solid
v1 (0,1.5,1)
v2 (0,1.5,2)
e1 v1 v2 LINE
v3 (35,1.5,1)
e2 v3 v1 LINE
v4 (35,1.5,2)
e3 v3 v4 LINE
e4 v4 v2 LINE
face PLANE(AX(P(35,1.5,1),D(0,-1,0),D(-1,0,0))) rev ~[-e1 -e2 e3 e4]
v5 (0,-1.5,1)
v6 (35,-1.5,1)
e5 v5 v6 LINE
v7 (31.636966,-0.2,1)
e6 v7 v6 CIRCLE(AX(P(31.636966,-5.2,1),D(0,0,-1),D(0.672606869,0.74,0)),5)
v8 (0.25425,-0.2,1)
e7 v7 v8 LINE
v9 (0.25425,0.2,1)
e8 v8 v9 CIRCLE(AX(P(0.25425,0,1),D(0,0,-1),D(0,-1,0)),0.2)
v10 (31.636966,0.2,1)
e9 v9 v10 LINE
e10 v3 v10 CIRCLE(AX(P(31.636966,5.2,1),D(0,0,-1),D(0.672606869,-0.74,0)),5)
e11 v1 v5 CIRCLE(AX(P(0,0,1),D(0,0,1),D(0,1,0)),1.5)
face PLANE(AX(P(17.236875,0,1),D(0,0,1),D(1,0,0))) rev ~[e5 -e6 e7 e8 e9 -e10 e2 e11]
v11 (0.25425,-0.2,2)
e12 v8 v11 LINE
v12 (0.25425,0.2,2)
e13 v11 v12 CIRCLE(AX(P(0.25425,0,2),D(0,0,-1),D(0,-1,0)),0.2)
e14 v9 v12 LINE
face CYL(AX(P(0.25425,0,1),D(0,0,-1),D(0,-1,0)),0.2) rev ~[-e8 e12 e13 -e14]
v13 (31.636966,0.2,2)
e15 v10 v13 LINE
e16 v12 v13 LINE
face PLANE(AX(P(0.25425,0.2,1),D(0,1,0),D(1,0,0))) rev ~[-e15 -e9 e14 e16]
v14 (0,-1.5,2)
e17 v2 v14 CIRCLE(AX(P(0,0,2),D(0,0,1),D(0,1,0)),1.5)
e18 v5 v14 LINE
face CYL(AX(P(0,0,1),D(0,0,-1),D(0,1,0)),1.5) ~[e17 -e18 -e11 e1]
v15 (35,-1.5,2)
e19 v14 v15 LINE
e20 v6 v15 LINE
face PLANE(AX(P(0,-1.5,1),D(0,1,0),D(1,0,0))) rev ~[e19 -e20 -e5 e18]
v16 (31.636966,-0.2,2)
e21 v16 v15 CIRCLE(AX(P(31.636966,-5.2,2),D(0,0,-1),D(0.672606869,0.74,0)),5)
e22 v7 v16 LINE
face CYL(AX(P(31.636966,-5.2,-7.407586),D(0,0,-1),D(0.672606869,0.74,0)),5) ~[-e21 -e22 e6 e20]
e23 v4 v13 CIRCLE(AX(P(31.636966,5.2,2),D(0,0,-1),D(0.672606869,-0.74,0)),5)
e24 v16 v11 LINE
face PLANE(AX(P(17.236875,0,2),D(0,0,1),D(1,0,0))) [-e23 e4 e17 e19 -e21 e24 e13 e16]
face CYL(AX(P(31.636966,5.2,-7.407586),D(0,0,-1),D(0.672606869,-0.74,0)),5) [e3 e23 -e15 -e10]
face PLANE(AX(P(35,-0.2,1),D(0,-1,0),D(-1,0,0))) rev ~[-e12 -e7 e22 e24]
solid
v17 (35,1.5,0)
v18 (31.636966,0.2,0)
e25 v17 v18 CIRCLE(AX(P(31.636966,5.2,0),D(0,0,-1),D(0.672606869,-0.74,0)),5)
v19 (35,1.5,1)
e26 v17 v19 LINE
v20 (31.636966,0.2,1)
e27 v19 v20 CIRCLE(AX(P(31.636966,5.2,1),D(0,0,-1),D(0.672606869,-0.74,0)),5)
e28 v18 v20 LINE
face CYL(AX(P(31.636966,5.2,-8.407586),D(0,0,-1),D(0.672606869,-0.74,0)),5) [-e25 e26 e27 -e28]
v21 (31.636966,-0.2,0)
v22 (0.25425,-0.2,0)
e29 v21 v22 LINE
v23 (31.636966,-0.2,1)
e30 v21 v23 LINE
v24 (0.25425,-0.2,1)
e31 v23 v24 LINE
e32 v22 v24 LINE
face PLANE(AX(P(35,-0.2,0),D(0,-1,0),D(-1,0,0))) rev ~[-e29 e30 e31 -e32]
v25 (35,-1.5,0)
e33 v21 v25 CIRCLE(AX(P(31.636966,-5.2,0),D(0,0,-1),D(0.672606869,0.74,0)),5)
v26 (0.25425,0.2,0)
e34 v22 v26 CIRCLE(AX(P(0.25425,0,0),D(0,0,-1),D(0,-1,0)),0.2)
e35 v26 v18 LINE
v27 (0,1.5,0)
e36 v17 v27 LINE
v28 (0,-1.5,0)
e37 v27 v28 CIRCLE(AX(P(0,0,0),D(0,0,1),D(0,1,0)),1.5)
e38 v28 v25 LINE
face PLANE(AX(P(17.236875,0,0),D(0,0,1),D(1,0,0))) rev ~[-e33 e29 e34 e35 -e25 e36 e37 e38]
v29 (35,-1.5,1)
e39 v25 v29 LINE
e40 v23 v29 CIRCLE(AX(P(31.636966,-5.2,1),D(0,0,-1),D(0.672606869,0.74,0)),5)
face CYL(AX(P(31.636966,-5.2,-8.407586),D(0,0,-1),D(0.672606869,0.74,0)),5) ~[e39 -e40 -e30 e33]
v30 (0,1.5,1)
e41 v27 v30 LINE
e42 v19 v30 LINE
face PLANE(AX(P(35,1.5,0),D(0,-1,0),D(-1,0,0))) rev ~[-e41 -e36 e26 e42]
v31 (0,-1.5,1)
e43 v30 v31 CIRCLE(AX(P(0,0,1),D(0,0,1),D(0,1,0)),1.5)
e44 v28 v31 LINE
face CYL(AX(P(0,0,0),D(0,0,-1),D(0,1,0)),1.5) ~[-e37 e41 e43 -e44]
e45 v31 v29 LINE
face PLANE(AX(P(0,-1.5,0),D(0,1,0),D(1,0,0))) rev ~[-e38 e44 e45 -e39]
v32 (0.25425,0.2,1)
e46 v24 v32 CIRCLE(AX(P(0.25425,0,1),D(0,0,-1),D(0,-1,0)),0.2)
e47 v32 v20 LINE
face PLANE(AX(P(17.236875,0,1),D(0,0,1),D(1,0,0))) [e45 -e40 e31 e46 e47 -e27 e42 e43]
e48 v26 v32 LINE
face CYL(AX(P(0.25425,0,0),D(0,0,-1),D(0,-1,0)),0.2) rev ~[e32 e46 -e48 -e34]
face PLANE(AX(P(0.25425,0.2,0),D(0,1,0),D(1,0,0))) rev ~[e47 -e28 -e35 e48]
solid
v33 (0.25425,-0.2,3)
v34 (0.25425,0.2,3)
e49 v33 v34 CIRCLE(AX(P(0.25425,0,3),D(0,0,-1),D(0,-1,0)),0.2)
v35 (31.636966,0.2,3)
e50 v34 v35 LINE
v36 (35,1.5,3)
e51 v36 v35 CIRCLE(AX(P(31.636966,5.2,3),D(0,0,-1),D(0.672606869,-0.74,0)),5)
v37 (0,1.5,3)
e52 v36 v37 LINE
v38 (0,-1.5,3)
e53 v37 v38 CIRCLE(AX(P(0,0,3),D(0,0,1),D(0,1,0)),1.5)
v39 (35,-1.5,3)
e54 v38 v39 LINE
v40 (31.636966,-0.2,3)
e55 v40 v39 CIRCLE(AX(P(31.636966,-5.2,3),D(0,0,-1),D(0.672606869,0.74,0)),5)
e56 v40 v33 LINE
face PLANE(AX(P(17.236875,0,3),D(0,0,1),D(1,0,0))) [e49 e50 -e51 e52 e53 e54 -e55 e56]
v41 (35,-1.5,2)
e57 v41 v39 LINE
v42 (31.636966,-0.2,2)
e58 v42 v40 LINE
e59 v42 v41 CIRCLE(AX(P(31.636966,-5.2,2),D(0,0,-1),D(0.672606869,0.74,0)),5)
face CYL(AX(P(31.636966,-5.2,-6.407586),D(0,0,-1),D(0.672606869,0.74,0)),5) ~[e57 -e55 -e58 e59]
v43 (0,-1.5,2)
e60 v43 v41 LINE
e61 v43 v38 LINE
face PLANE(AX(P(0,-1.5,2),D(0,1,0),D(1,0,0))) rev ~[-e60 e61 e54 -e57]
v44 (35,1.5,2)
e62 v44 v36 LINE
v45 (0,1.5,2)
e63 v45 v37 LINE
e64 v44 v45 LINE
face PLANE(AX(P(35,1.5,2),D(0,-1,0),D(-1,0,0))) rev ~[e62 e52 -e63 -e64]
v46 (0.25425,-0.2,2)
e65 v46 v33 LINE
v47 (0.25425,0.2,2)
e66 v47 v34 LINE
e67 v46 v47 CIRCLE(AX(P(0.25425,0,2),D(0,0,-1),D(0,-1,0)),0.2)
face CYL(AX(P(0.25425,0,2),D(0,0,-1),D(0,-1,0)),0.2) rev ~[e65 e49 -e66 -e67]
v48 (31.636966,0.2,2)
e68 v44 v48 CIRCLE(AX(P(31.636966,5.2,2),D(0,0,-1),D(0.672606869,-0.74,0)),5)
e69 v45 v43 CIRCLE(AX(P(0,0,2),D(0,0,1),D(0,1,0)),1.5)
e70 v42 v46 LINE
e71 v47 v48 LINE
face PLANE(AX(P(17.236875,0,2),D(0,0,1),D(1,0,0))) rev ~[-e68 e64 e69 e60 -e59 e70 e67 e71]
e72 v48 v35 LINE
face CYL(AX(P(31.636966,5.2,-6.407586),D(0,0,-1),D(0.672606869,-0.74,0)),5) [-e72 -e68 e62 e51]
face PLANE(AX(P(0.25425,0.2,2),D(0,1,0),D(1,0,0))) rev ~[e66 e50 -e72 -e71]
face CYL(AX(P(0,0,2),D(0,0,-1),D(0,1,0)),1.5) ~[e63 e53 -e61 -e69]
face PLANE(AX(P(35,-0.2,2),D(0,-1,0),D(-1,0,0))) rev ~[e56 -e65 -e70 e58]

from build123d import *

# Parameters (mm, degrees)
F1_DEPTH      = 1
F2_DEPTH      = 1
F3_DEPTH      = 1
F4_T1_DEPTH   = 17.8151717208
F4_2_T1_DEPTH = 17.8151717208
F4_3_T1_DEPTH = 17.8151717208


# Not quite as in the source:
# - a fillet or chamfer that OpenCascade refuses, or shapes differently, is made with other operations: its cross-section is extruded or revolved along the edge and cut away or added


with BuildPart() as f1:
    # F0 (on Top) → F1 (new body)
    with BuildSketch(Plane.XY):
        with BuildLine():
            Line((35, 1.5), (0, 1.5))
            ThreePointArc((0, 1.5), (-1.5, 0), (0, -1.5))
            Line((0, -1.5), (35, -1.5))
            Line((35, -1.5), (35, -0.2))
            Line((35, -0.2), (0.254249986, -0.2))
            ThreePointArc((0.254249986, -0.2), (0.054249986, 0), (0.254249986, 0.2))
            Line((0.254249986, 0.2), (35, 0.2))
            Line((35, 0.2), (35, 1.5))
        make_face()
    extrude(amount=F1_DEPTH)


with BuildPart() as f2:
    # F2 (new): a face of the model
    f2_faces = [f1.part.faces().sort_by_distance(p)[0] for p in [
        (34.6337691985, 0.85, 1),
    ]]
    extrude(f2_faces, amount=F2_DEPTH)


with BuildPart() as f3:
    # F3 (new): a face of the model
    f3_faces = [f2.part.faces().sort_by_distance(p)[0] for p in [
        (34.6337691985, 0.85, 2),
    ]]
    extrude(f3_faces, amount=F3_DEPTH)

    # F4#3: fillet of radius 5 on 2 edges, made by hand

    # F4_3_s2 → F4_3_t1 (cut)
    with BuildSketch(Plane.XY.offset(-6.4075858604)):
        with BuildLine():
            ThreePointArc((35, -1.5), (33.4397412936, -0.5363104735), (31.6369656558, -0.2))
            Line((31.6369656558, -0.2), (35, -0.2))
            Line((35, -0.2), (35, -1.5))
        make_face()
        with BuildLine():
            ThreePointArc((35, 1.5), (33.4397412936, 0.5363104735), (31.6369656558, 0.2))
            Line((31.6369656558, 0.2), (35, 0.2))
            Line((35, 0.2), (35, 1.5))
        make_face()
    extrude(amount=F4_3_T1_DEPTH, mode=Mode.SUBTRACT)


with BuildPart() as f1_1:
    add(f1.part)

    # F4: fillet of radius 5 on 2 edges, made by hand

    # F4_s2 → F4_t1 (cut)
    with BuildSketch(Plane.XY.offset(-8.4075858604)):
        with BuildLine():
            ThreePointArc((35, 1.5), (33.4397412936, 0.5363104735), (31.6369656558, 0.2))
            Line((31.6369656558, 0.2), (35, 0.2))
            Line((35, 0.2), (35, 1.5))
        make_face()
        with BuildLine():
            ThreePointArc((35, -1.5), (33.4397412936, -0.5363104735), (31.6369656558, -0.2))
            Line((31.6369656558, -0.2), (35, -0.2))
            Line((35, -0.2), (35, -1.5))
        make_face()
    extrude(amount=F4_T1_DEPTH, mode=Mode.SUBTRACT)


with BuildPart() as f2_1:
    add(f2.part)

    # F4#2: fillet of radius 5 on 2 edges, made by hand

    # F4_2_s2 → F4_2_t1 (cut)
    with BuildSketch(Plane.XY.offset(-7.4075858604)):
        with BuildLine():
            ThreePointArc((35, 1.5), (33.4397412936, 0.5363104735), (31.6369656558, 0.2))
            Line((31.6369656558, 0.2), (35, 0.2))
            Line((35, 0.2), (35, 1.5))
        make_face()
        with BuildLine():
            ThreePointArc((35, -1.5), (33.4397412936, -0.5363104735), (31.6369656558, -0.2))
            Line((31.6369656558, -0.2), (35, -0.2))
            Line((35, -0.2), (35, -1.5))
        make_face()
    extrude(amount=F4_2_T1_DEPTH, mode=Mode.SUBTRACT)


solid = Compound([f3.part, f1_1.part, f2_1.part])
